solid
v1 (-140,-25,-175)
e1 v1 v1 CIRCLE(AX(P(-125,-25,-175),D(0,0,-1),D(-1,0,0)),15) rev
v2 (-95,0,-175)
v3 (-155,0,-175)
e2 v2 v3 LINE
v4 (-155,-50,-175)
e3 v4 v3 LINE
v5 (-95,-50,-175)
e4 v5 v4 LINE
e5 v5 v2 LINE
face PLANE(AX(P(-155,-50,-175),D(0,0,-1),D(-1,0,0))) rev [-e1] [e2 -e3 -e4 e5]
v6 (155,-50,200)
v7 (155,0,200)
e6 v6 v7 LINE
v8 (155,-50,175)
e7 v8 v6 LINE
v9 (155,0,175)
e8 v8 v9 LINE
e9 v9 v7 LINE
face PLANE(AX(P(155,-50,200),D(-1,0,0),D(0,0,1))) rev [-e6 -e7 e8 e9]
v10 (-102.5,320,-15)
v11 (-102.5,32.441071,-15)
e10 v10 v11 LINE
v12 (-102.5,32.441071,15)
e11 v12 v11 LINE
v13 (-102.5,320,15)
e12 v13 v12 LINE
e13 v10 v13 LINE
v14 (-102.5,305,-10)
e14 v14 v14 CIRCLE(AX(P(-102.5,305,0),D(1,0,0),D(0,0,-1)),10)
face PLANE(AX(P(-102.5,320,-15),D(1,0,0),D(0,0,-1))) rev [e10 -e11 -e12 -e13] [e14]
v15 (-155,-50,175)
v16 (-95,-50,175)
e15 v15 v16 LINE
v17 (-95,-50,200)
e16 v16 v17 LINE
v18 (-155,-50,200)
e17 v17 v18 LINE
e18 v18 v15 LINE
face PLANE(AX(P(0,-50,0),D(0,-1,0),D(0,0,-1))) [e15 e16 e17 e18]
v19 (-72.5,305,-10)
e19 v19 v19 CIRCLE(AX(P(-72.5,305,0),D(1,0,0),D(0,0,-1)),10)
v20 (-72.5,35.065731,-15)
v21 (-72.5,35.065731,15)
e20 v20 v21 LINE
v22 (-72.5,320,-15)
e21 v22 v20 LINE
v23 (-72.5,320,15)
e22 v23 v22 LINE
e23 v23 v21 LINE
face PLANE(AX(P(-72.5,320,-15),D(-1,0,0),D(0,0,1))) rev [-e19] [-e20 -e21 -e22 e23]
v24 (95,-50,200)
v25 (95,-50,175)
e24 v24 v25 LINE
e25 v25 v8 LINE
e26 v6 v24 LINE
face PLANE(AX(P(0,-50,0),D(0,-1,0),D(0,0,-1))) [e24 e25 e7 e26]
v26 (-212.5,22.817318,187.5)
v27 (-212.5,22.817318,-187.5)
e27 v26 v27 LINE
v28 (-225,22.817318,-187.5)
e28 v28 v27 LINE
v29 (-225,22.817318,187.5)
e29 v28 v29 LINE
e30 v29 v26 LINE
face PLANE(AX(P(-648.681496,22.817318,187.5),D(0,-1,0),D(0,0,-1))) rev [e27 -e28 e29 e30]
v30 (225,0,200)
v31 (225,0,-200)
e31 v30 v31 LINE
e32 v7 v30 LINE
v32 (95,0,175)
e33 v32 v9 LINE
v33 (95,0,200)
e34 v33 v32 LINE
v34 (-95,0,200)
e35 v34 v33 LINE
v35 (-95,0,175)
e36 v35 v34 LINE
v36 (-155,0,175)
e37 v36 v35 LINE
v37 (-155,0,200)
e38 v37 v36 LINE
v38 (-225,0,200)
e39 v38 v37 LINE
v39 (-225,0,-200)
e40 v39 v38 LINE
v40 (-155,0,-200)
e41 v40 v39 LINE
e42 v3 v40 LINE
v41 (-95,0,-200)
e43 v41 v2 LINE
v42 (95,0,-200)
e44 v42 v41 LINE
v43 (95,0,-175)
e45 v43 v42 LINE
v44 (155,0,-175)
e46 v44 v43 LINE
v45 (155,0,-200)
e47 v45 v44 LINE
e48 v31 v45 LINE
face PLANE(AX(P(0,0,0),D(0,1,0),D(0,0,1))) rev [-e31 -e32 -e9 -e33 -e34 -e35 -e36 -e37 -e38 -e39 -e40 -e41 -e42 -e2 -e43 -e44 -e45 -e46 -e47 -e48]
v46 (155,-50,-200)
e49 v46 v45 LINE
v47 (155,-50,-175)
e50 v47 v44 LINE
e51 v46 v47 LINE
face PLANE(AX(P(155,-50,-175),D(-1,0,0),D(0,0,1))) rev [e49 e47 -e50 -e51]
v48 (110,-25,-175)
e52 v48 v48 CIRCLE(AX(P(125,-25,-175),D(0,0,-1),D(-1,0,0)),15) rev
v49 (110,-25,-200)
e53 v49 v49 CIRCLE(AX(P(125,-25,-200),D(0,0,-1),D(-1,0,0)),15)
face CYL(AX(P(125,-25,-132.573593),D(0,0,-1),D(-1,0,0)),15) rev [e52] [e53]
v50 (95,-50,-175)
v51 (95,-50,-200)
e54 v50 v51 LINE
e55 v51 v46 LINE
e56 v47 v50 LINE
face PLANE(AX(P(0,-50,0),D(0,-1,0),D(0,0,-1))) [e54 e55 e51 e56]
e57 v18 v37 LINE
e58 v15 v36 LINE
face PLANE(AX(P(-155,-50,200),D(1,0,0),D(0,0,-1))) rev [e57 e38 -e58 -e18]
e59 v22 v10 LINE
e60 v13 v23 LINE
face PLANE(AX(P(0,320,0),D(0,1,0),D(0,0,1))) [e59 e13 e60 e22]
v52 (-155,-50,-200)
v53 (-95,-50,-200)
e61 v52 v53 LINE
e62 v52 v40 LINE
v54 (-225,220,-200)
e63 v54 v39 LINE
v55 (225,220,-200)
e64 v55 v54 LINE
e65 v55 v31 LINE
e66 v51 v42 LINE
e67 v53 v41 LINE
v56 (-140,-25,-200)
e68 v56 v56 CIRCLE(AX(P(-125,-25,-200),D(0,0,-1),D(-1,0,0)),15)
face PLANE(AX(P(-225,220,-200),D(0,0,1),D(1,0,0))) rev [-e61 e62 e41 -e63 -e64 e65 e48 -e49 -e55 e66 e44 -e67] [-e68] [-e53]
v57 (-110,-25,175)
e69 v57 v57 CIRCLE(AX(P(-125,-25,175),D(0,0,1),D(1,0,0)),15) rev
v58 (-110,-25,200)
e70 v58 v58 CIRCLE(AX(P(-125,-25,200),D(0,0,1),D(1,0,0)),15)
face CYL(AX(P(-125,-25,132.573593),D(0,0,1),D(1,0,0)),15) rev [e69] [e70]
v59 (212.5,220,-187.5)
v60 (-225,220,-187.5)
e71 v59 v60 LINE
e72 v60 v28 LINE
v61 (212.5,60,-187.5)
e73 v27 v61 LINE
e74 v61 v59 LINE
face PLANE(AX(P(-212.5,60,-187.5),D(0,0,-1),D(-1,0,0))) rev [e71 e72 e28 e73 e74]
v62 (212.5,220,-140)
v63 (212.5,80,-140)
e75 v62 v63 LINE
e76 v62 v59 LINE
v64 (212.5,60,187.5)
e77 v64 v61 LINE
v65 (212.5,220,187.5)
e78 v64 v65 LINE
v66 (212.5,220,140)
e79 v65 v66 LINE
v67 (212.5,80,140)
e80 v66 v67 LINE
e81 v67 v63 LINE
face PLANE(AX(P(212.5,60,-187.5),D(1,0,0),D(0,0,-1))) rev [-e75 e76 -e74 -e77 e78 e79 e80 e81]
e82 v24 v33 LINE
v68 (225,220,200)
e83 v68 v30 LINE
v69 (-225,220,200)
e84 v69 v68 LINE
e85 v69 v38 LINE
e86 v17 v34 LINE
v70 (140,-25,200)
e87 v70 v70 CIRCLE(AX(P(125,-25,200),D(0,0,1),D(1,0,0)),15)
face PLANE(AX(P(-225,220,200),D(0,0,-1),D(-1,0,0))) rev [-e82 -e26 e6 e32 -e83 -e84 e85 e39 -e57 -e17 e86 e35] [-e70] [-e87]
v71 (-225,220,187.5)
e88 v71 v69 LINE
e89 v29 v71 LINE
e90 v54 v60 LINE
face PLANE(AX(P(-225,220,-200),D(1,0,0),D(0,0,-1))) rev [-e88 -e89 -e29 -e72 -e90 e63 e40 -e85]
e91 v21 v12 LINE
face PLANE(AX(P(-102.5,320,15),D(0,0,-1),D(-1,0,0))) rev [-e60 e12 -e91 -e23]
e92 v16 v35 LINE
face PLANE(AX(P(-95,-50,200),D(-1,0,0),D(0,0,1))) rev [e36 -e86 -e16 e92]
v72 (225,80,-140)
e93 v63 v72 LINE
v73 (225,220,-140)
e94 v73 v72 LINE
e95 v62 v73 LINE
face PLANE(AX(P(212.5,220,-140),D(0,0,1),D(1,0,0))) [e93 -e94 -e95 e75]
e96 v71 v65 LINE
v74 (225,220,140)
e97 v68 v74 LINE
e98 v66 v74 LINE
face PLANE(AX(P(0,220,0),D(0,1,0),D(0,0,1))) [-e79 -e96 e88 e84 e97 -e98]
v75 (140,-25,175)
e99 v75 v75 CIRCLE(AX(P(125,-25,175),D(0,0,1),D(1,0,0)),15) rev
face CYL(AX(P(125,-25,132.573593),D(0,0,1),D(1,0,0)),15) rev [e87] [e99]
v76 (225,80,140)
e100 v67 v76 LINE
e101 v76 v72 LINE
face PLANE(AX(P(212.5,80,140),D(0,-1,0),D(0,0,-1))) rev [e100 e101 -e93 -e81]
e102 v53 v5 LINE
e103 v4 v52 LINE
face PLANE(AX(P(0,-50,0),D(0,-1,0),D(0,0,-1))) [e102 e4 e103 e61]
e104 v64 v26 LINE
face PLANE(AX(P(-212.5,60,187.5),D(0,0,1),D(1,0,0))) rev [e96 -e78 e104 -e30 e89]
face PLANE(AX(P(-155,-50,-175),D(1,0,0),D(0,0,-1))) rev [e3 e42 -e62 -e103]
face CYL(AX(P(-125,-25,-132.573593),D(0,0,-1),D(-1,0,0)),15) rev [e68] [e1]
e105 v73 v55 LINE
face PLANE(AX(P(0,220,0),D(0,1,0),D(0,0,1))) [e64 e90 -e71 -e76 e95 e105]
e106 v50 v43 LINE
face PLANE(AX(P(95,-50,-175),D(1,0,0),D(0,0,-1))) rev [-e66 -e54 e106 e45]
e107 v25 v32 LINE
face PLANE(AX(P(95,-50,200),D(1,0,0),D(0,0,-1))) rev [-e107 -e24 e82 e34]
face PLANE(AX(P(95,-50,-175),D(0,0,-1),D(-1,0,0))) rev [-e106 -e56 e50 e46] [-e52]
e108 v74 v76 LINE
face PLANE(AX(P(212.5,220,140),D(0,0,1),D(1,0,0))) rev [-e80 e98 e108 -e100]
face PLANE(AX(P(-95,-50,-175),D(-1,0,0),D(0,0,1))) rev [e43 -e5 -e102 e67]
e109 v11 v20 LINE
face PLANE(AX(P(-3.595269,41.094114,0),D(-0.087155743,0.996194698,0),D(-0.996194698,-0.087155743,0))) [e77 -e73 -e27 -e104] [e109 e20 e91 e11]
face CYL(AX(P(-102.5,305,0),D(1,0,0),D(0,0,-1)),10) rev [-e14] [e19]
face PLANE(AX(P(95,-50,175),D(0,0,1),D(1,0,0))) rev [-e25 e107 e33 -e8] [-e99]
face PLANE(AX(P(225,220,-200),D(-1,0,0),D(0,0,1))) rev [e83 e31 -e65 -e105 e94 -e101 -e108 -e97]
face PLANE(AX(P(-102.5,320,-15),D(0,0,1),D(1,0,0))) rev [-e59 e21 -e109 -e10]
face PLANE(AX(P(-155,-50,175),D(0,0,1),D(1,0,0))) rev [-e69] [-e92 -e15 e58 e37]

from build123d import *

# Parameters (mm, degrees)
SKETCH1_W            = 450
SKETCH1_H            = 400
BOSS_EXTRUDE1_DEPTH  = 220
SKETCH2_W            = 425
SKETCH2_H            = 375
CUT_EXTRUDE1_DEPTH   = 160
SKETCH3_W            = 280
SKETCH3_H            = 140
CUT_EXTRUDE2_DEPTH   = 12.5
SKETCH4_W            = 30
SKETCH4_H            = 30
BOSS_EXTRUDE2_DEPTH  = 260
SKETCH5_R            = 10
CUT_EXTRUDE3_DEPTH   = 30
SKETCH6_W            = 60
SKETCH6_H            = 25
BOSS_EXTRUDE3_DEPTH  = 50
SKETCH7_R            = 15
CUT_EXTRUDE4_DEPTH   = 25
CUT_EXTRUDE5_START   = -25
SKETCH8_R            = 15
CUT_EXTRUDE5_DEPTH   = 25
CUT_EXTRUDE6_START   = -187.5
CUT_EXTRUDE6_DEPTH   = 375
CUT_EXTRUDE6_2_DEPTH = 172.5
CUT_EXTRUDE6_START_2 = 15
CUT_EXTRUDE6_3_DEPTH = 172.5
SKETCH10_W           = 375
SKETCH10_H           = 197.182681999
CUT_EXTRUDE7_DEPTH   = 12.5


# Read off the part's stored shape, not the designer's step: Cut-Extrude6
with BuildPart() as part:
    # Sketch1 → Boss-Extrude1 (new body)
    with BuildSketch(Plane(origin=(0, 0, 0), x_dir=(1, 0, 0), z_dir=(0, 1, 0))):
        Rectangle(SKETCH1_W, SKETCH1_H)
    extrude(amount=BOSS_EXTRUDE1_DEPTH)

    # Sketch2 → Cut-Extrude1 (cut)
    with BuildSketch(Plane(origin=(0, 220, 0), x_dir=(1, 0, 0), z_dir=(0, 1, 0))):
        Rectangle(SKETCH2_W, SKETCH2_H)
    extrude(amount=-CUT_EXTRUDE1_DEPTH, mode=Mode.SUBTRACT)

    # Sketch3 → Cut-Extrude2 (cut)
    with BuildSketch(Plane(origin=(225, 0, 0), x_dir=(0, 0, -1), z_dir=(1, 0, 0))):
        with Locations((0, 150)):
            Rectangle(SKETCH3_W, SKETCH3_H)
    extrude(amount=-CUT_EXTRUDE2_DEPTH, mode=Mode.SUBTRACT)

    # Sketch4 → Boss-Extrude2 (add)
    with BuildSketch(Plane(origin=(0, 60, 0), x_dir=(1, 0, 0), z_dir=(0, 1, 0))):
        with Locations((-87.5, 0)):
            Rectangle(SKETCH4_W, SKETCH4_H)
    extrude(amount=BOSS_EXTRUDE2_DEPTH)

    # Sketch5 → Cut-Extrude3 (cut)
    with BuildSketch(Plane(origin=(-72.5, 0, 0), x_dir=(0, 0, -1), z_dir=(1, 0, 0))):
        with Locations((0, 305)):
            Circle(SKETCH5_R)
    extrude(amount=-CUT_EXTRUDE3_DEPTH, mode=Mode.SUBTRACT)

    # Sketch6 → Boss-Extrude3 (add)
    with BuildSketch(Plane.XZ):
        with Locations((125, 187.5)):
            Rectangle(SKETCH6_W, SKETCH6_H)
        with Locations((-125, 187.5)):
            Rectangle(SKETCH6_W, SKETCH6_H)
        with Locations((-125, -187.5)):
            Rectangle(SKETCH6_W, SKETCH6_H)
        with Locations((125, -187.5)):
            Rectangle(SKETCH6_W, SKETCH6_H)
    extrude(amount=BOSS_EXTRUDE3_DEPTH)

    # Sketch7 → Cut-Extrude4 (cut)
    with BuildSketch(Plane(origin=(0, 0, -200), x_dir=(-1, 0, 0), z_dir=(0, 0, -1))):
        with Locations((125, -25)):
            Circle(SKETCH7_R)
        with Locations((-125, -25)):
            Circle(SKETCH7_R)
    extrude(amount=-CUT_EXTRUDE4_DEPTH, mode=Mode.SUBTRACT)

    # Sketch8 → Cut-Extrude5 (cut)
    with BuildSketch(Plane.XY.offset(200).offset(CUT_EXTRUDE5_START)):
        with Locations(Location((-125, -25, 0), (0, 0, 180))):
            Circle(SKETCH8_R)
        with Locations(Location((125, -25, 0), (0, 0, 180))):
            Circle(SKETCH8_R)
    extrude(amount=CUT_EXTRUDE5_DEPTH, mode=Mode.SUBTRACT)

    # Cut-Extrude6 outline → Cut-Extrude6 (cut)
    with BuildSketch(Plane.XY.offset(CUT_EXTRUDE6_START)):
        Polygon((-102.5, 60), (-212.5, 60), (-212.5, 22.817318001), (-102.5, 32.441070989), align=None)
        Polygon((212.5, 60), (-72.5, 60), (-72.5, 35.065730895), align=None)
    extrude(amount=CUT_EXTRUDE6_DEPTH, mode=Mode.SUBTRACT)

    # Cut-Extrude6 2 outline → Cut-Extrude6 2 (cut)
    with BuildSketch(Plane.XY.offset(CUT_EXTRUDE6_START)):
        Polygon((-72.5, 60), (-102.5, 60), (-102.5, 32.441070989), (-72.5, 35.065730895), align=None)
    extrude(amount=CUT_EXTRUDE6_2_DEPTH, mode=Mode.SUBTRACT)

    # Cut-Extrude6 3 outline → Cut-Extrude6 3 (cut)
    with BuildSketch(Plane.XY.offset(CUT_EXTRUDE6_START_2)):
        Polygon((-72.5, 60), (-102.5, 60), (-102.5, 32.441070989), (-72.5, 35.065730895), align=None)
    extrude(amount=CUT_EXTRUDE6_3_DEPTH, mode=Mode.SUBTRACT)

    # Sketch10 → Cut-Extrude7 (cut)
    with BuildSketch(Plane(origin=(-212.5, 0, 0), x_dir=(0, 0, -1), z_dir=(1, 0, 0))):
        with Locations((0, 121.408659)):
            Rectangle(SKETCH10_W, SKETCH10_H)
    extrude(amount=-CUT_EXTRUDE7_DEPTH, mode=Mode.SUBTRACT)


solid = part.part
